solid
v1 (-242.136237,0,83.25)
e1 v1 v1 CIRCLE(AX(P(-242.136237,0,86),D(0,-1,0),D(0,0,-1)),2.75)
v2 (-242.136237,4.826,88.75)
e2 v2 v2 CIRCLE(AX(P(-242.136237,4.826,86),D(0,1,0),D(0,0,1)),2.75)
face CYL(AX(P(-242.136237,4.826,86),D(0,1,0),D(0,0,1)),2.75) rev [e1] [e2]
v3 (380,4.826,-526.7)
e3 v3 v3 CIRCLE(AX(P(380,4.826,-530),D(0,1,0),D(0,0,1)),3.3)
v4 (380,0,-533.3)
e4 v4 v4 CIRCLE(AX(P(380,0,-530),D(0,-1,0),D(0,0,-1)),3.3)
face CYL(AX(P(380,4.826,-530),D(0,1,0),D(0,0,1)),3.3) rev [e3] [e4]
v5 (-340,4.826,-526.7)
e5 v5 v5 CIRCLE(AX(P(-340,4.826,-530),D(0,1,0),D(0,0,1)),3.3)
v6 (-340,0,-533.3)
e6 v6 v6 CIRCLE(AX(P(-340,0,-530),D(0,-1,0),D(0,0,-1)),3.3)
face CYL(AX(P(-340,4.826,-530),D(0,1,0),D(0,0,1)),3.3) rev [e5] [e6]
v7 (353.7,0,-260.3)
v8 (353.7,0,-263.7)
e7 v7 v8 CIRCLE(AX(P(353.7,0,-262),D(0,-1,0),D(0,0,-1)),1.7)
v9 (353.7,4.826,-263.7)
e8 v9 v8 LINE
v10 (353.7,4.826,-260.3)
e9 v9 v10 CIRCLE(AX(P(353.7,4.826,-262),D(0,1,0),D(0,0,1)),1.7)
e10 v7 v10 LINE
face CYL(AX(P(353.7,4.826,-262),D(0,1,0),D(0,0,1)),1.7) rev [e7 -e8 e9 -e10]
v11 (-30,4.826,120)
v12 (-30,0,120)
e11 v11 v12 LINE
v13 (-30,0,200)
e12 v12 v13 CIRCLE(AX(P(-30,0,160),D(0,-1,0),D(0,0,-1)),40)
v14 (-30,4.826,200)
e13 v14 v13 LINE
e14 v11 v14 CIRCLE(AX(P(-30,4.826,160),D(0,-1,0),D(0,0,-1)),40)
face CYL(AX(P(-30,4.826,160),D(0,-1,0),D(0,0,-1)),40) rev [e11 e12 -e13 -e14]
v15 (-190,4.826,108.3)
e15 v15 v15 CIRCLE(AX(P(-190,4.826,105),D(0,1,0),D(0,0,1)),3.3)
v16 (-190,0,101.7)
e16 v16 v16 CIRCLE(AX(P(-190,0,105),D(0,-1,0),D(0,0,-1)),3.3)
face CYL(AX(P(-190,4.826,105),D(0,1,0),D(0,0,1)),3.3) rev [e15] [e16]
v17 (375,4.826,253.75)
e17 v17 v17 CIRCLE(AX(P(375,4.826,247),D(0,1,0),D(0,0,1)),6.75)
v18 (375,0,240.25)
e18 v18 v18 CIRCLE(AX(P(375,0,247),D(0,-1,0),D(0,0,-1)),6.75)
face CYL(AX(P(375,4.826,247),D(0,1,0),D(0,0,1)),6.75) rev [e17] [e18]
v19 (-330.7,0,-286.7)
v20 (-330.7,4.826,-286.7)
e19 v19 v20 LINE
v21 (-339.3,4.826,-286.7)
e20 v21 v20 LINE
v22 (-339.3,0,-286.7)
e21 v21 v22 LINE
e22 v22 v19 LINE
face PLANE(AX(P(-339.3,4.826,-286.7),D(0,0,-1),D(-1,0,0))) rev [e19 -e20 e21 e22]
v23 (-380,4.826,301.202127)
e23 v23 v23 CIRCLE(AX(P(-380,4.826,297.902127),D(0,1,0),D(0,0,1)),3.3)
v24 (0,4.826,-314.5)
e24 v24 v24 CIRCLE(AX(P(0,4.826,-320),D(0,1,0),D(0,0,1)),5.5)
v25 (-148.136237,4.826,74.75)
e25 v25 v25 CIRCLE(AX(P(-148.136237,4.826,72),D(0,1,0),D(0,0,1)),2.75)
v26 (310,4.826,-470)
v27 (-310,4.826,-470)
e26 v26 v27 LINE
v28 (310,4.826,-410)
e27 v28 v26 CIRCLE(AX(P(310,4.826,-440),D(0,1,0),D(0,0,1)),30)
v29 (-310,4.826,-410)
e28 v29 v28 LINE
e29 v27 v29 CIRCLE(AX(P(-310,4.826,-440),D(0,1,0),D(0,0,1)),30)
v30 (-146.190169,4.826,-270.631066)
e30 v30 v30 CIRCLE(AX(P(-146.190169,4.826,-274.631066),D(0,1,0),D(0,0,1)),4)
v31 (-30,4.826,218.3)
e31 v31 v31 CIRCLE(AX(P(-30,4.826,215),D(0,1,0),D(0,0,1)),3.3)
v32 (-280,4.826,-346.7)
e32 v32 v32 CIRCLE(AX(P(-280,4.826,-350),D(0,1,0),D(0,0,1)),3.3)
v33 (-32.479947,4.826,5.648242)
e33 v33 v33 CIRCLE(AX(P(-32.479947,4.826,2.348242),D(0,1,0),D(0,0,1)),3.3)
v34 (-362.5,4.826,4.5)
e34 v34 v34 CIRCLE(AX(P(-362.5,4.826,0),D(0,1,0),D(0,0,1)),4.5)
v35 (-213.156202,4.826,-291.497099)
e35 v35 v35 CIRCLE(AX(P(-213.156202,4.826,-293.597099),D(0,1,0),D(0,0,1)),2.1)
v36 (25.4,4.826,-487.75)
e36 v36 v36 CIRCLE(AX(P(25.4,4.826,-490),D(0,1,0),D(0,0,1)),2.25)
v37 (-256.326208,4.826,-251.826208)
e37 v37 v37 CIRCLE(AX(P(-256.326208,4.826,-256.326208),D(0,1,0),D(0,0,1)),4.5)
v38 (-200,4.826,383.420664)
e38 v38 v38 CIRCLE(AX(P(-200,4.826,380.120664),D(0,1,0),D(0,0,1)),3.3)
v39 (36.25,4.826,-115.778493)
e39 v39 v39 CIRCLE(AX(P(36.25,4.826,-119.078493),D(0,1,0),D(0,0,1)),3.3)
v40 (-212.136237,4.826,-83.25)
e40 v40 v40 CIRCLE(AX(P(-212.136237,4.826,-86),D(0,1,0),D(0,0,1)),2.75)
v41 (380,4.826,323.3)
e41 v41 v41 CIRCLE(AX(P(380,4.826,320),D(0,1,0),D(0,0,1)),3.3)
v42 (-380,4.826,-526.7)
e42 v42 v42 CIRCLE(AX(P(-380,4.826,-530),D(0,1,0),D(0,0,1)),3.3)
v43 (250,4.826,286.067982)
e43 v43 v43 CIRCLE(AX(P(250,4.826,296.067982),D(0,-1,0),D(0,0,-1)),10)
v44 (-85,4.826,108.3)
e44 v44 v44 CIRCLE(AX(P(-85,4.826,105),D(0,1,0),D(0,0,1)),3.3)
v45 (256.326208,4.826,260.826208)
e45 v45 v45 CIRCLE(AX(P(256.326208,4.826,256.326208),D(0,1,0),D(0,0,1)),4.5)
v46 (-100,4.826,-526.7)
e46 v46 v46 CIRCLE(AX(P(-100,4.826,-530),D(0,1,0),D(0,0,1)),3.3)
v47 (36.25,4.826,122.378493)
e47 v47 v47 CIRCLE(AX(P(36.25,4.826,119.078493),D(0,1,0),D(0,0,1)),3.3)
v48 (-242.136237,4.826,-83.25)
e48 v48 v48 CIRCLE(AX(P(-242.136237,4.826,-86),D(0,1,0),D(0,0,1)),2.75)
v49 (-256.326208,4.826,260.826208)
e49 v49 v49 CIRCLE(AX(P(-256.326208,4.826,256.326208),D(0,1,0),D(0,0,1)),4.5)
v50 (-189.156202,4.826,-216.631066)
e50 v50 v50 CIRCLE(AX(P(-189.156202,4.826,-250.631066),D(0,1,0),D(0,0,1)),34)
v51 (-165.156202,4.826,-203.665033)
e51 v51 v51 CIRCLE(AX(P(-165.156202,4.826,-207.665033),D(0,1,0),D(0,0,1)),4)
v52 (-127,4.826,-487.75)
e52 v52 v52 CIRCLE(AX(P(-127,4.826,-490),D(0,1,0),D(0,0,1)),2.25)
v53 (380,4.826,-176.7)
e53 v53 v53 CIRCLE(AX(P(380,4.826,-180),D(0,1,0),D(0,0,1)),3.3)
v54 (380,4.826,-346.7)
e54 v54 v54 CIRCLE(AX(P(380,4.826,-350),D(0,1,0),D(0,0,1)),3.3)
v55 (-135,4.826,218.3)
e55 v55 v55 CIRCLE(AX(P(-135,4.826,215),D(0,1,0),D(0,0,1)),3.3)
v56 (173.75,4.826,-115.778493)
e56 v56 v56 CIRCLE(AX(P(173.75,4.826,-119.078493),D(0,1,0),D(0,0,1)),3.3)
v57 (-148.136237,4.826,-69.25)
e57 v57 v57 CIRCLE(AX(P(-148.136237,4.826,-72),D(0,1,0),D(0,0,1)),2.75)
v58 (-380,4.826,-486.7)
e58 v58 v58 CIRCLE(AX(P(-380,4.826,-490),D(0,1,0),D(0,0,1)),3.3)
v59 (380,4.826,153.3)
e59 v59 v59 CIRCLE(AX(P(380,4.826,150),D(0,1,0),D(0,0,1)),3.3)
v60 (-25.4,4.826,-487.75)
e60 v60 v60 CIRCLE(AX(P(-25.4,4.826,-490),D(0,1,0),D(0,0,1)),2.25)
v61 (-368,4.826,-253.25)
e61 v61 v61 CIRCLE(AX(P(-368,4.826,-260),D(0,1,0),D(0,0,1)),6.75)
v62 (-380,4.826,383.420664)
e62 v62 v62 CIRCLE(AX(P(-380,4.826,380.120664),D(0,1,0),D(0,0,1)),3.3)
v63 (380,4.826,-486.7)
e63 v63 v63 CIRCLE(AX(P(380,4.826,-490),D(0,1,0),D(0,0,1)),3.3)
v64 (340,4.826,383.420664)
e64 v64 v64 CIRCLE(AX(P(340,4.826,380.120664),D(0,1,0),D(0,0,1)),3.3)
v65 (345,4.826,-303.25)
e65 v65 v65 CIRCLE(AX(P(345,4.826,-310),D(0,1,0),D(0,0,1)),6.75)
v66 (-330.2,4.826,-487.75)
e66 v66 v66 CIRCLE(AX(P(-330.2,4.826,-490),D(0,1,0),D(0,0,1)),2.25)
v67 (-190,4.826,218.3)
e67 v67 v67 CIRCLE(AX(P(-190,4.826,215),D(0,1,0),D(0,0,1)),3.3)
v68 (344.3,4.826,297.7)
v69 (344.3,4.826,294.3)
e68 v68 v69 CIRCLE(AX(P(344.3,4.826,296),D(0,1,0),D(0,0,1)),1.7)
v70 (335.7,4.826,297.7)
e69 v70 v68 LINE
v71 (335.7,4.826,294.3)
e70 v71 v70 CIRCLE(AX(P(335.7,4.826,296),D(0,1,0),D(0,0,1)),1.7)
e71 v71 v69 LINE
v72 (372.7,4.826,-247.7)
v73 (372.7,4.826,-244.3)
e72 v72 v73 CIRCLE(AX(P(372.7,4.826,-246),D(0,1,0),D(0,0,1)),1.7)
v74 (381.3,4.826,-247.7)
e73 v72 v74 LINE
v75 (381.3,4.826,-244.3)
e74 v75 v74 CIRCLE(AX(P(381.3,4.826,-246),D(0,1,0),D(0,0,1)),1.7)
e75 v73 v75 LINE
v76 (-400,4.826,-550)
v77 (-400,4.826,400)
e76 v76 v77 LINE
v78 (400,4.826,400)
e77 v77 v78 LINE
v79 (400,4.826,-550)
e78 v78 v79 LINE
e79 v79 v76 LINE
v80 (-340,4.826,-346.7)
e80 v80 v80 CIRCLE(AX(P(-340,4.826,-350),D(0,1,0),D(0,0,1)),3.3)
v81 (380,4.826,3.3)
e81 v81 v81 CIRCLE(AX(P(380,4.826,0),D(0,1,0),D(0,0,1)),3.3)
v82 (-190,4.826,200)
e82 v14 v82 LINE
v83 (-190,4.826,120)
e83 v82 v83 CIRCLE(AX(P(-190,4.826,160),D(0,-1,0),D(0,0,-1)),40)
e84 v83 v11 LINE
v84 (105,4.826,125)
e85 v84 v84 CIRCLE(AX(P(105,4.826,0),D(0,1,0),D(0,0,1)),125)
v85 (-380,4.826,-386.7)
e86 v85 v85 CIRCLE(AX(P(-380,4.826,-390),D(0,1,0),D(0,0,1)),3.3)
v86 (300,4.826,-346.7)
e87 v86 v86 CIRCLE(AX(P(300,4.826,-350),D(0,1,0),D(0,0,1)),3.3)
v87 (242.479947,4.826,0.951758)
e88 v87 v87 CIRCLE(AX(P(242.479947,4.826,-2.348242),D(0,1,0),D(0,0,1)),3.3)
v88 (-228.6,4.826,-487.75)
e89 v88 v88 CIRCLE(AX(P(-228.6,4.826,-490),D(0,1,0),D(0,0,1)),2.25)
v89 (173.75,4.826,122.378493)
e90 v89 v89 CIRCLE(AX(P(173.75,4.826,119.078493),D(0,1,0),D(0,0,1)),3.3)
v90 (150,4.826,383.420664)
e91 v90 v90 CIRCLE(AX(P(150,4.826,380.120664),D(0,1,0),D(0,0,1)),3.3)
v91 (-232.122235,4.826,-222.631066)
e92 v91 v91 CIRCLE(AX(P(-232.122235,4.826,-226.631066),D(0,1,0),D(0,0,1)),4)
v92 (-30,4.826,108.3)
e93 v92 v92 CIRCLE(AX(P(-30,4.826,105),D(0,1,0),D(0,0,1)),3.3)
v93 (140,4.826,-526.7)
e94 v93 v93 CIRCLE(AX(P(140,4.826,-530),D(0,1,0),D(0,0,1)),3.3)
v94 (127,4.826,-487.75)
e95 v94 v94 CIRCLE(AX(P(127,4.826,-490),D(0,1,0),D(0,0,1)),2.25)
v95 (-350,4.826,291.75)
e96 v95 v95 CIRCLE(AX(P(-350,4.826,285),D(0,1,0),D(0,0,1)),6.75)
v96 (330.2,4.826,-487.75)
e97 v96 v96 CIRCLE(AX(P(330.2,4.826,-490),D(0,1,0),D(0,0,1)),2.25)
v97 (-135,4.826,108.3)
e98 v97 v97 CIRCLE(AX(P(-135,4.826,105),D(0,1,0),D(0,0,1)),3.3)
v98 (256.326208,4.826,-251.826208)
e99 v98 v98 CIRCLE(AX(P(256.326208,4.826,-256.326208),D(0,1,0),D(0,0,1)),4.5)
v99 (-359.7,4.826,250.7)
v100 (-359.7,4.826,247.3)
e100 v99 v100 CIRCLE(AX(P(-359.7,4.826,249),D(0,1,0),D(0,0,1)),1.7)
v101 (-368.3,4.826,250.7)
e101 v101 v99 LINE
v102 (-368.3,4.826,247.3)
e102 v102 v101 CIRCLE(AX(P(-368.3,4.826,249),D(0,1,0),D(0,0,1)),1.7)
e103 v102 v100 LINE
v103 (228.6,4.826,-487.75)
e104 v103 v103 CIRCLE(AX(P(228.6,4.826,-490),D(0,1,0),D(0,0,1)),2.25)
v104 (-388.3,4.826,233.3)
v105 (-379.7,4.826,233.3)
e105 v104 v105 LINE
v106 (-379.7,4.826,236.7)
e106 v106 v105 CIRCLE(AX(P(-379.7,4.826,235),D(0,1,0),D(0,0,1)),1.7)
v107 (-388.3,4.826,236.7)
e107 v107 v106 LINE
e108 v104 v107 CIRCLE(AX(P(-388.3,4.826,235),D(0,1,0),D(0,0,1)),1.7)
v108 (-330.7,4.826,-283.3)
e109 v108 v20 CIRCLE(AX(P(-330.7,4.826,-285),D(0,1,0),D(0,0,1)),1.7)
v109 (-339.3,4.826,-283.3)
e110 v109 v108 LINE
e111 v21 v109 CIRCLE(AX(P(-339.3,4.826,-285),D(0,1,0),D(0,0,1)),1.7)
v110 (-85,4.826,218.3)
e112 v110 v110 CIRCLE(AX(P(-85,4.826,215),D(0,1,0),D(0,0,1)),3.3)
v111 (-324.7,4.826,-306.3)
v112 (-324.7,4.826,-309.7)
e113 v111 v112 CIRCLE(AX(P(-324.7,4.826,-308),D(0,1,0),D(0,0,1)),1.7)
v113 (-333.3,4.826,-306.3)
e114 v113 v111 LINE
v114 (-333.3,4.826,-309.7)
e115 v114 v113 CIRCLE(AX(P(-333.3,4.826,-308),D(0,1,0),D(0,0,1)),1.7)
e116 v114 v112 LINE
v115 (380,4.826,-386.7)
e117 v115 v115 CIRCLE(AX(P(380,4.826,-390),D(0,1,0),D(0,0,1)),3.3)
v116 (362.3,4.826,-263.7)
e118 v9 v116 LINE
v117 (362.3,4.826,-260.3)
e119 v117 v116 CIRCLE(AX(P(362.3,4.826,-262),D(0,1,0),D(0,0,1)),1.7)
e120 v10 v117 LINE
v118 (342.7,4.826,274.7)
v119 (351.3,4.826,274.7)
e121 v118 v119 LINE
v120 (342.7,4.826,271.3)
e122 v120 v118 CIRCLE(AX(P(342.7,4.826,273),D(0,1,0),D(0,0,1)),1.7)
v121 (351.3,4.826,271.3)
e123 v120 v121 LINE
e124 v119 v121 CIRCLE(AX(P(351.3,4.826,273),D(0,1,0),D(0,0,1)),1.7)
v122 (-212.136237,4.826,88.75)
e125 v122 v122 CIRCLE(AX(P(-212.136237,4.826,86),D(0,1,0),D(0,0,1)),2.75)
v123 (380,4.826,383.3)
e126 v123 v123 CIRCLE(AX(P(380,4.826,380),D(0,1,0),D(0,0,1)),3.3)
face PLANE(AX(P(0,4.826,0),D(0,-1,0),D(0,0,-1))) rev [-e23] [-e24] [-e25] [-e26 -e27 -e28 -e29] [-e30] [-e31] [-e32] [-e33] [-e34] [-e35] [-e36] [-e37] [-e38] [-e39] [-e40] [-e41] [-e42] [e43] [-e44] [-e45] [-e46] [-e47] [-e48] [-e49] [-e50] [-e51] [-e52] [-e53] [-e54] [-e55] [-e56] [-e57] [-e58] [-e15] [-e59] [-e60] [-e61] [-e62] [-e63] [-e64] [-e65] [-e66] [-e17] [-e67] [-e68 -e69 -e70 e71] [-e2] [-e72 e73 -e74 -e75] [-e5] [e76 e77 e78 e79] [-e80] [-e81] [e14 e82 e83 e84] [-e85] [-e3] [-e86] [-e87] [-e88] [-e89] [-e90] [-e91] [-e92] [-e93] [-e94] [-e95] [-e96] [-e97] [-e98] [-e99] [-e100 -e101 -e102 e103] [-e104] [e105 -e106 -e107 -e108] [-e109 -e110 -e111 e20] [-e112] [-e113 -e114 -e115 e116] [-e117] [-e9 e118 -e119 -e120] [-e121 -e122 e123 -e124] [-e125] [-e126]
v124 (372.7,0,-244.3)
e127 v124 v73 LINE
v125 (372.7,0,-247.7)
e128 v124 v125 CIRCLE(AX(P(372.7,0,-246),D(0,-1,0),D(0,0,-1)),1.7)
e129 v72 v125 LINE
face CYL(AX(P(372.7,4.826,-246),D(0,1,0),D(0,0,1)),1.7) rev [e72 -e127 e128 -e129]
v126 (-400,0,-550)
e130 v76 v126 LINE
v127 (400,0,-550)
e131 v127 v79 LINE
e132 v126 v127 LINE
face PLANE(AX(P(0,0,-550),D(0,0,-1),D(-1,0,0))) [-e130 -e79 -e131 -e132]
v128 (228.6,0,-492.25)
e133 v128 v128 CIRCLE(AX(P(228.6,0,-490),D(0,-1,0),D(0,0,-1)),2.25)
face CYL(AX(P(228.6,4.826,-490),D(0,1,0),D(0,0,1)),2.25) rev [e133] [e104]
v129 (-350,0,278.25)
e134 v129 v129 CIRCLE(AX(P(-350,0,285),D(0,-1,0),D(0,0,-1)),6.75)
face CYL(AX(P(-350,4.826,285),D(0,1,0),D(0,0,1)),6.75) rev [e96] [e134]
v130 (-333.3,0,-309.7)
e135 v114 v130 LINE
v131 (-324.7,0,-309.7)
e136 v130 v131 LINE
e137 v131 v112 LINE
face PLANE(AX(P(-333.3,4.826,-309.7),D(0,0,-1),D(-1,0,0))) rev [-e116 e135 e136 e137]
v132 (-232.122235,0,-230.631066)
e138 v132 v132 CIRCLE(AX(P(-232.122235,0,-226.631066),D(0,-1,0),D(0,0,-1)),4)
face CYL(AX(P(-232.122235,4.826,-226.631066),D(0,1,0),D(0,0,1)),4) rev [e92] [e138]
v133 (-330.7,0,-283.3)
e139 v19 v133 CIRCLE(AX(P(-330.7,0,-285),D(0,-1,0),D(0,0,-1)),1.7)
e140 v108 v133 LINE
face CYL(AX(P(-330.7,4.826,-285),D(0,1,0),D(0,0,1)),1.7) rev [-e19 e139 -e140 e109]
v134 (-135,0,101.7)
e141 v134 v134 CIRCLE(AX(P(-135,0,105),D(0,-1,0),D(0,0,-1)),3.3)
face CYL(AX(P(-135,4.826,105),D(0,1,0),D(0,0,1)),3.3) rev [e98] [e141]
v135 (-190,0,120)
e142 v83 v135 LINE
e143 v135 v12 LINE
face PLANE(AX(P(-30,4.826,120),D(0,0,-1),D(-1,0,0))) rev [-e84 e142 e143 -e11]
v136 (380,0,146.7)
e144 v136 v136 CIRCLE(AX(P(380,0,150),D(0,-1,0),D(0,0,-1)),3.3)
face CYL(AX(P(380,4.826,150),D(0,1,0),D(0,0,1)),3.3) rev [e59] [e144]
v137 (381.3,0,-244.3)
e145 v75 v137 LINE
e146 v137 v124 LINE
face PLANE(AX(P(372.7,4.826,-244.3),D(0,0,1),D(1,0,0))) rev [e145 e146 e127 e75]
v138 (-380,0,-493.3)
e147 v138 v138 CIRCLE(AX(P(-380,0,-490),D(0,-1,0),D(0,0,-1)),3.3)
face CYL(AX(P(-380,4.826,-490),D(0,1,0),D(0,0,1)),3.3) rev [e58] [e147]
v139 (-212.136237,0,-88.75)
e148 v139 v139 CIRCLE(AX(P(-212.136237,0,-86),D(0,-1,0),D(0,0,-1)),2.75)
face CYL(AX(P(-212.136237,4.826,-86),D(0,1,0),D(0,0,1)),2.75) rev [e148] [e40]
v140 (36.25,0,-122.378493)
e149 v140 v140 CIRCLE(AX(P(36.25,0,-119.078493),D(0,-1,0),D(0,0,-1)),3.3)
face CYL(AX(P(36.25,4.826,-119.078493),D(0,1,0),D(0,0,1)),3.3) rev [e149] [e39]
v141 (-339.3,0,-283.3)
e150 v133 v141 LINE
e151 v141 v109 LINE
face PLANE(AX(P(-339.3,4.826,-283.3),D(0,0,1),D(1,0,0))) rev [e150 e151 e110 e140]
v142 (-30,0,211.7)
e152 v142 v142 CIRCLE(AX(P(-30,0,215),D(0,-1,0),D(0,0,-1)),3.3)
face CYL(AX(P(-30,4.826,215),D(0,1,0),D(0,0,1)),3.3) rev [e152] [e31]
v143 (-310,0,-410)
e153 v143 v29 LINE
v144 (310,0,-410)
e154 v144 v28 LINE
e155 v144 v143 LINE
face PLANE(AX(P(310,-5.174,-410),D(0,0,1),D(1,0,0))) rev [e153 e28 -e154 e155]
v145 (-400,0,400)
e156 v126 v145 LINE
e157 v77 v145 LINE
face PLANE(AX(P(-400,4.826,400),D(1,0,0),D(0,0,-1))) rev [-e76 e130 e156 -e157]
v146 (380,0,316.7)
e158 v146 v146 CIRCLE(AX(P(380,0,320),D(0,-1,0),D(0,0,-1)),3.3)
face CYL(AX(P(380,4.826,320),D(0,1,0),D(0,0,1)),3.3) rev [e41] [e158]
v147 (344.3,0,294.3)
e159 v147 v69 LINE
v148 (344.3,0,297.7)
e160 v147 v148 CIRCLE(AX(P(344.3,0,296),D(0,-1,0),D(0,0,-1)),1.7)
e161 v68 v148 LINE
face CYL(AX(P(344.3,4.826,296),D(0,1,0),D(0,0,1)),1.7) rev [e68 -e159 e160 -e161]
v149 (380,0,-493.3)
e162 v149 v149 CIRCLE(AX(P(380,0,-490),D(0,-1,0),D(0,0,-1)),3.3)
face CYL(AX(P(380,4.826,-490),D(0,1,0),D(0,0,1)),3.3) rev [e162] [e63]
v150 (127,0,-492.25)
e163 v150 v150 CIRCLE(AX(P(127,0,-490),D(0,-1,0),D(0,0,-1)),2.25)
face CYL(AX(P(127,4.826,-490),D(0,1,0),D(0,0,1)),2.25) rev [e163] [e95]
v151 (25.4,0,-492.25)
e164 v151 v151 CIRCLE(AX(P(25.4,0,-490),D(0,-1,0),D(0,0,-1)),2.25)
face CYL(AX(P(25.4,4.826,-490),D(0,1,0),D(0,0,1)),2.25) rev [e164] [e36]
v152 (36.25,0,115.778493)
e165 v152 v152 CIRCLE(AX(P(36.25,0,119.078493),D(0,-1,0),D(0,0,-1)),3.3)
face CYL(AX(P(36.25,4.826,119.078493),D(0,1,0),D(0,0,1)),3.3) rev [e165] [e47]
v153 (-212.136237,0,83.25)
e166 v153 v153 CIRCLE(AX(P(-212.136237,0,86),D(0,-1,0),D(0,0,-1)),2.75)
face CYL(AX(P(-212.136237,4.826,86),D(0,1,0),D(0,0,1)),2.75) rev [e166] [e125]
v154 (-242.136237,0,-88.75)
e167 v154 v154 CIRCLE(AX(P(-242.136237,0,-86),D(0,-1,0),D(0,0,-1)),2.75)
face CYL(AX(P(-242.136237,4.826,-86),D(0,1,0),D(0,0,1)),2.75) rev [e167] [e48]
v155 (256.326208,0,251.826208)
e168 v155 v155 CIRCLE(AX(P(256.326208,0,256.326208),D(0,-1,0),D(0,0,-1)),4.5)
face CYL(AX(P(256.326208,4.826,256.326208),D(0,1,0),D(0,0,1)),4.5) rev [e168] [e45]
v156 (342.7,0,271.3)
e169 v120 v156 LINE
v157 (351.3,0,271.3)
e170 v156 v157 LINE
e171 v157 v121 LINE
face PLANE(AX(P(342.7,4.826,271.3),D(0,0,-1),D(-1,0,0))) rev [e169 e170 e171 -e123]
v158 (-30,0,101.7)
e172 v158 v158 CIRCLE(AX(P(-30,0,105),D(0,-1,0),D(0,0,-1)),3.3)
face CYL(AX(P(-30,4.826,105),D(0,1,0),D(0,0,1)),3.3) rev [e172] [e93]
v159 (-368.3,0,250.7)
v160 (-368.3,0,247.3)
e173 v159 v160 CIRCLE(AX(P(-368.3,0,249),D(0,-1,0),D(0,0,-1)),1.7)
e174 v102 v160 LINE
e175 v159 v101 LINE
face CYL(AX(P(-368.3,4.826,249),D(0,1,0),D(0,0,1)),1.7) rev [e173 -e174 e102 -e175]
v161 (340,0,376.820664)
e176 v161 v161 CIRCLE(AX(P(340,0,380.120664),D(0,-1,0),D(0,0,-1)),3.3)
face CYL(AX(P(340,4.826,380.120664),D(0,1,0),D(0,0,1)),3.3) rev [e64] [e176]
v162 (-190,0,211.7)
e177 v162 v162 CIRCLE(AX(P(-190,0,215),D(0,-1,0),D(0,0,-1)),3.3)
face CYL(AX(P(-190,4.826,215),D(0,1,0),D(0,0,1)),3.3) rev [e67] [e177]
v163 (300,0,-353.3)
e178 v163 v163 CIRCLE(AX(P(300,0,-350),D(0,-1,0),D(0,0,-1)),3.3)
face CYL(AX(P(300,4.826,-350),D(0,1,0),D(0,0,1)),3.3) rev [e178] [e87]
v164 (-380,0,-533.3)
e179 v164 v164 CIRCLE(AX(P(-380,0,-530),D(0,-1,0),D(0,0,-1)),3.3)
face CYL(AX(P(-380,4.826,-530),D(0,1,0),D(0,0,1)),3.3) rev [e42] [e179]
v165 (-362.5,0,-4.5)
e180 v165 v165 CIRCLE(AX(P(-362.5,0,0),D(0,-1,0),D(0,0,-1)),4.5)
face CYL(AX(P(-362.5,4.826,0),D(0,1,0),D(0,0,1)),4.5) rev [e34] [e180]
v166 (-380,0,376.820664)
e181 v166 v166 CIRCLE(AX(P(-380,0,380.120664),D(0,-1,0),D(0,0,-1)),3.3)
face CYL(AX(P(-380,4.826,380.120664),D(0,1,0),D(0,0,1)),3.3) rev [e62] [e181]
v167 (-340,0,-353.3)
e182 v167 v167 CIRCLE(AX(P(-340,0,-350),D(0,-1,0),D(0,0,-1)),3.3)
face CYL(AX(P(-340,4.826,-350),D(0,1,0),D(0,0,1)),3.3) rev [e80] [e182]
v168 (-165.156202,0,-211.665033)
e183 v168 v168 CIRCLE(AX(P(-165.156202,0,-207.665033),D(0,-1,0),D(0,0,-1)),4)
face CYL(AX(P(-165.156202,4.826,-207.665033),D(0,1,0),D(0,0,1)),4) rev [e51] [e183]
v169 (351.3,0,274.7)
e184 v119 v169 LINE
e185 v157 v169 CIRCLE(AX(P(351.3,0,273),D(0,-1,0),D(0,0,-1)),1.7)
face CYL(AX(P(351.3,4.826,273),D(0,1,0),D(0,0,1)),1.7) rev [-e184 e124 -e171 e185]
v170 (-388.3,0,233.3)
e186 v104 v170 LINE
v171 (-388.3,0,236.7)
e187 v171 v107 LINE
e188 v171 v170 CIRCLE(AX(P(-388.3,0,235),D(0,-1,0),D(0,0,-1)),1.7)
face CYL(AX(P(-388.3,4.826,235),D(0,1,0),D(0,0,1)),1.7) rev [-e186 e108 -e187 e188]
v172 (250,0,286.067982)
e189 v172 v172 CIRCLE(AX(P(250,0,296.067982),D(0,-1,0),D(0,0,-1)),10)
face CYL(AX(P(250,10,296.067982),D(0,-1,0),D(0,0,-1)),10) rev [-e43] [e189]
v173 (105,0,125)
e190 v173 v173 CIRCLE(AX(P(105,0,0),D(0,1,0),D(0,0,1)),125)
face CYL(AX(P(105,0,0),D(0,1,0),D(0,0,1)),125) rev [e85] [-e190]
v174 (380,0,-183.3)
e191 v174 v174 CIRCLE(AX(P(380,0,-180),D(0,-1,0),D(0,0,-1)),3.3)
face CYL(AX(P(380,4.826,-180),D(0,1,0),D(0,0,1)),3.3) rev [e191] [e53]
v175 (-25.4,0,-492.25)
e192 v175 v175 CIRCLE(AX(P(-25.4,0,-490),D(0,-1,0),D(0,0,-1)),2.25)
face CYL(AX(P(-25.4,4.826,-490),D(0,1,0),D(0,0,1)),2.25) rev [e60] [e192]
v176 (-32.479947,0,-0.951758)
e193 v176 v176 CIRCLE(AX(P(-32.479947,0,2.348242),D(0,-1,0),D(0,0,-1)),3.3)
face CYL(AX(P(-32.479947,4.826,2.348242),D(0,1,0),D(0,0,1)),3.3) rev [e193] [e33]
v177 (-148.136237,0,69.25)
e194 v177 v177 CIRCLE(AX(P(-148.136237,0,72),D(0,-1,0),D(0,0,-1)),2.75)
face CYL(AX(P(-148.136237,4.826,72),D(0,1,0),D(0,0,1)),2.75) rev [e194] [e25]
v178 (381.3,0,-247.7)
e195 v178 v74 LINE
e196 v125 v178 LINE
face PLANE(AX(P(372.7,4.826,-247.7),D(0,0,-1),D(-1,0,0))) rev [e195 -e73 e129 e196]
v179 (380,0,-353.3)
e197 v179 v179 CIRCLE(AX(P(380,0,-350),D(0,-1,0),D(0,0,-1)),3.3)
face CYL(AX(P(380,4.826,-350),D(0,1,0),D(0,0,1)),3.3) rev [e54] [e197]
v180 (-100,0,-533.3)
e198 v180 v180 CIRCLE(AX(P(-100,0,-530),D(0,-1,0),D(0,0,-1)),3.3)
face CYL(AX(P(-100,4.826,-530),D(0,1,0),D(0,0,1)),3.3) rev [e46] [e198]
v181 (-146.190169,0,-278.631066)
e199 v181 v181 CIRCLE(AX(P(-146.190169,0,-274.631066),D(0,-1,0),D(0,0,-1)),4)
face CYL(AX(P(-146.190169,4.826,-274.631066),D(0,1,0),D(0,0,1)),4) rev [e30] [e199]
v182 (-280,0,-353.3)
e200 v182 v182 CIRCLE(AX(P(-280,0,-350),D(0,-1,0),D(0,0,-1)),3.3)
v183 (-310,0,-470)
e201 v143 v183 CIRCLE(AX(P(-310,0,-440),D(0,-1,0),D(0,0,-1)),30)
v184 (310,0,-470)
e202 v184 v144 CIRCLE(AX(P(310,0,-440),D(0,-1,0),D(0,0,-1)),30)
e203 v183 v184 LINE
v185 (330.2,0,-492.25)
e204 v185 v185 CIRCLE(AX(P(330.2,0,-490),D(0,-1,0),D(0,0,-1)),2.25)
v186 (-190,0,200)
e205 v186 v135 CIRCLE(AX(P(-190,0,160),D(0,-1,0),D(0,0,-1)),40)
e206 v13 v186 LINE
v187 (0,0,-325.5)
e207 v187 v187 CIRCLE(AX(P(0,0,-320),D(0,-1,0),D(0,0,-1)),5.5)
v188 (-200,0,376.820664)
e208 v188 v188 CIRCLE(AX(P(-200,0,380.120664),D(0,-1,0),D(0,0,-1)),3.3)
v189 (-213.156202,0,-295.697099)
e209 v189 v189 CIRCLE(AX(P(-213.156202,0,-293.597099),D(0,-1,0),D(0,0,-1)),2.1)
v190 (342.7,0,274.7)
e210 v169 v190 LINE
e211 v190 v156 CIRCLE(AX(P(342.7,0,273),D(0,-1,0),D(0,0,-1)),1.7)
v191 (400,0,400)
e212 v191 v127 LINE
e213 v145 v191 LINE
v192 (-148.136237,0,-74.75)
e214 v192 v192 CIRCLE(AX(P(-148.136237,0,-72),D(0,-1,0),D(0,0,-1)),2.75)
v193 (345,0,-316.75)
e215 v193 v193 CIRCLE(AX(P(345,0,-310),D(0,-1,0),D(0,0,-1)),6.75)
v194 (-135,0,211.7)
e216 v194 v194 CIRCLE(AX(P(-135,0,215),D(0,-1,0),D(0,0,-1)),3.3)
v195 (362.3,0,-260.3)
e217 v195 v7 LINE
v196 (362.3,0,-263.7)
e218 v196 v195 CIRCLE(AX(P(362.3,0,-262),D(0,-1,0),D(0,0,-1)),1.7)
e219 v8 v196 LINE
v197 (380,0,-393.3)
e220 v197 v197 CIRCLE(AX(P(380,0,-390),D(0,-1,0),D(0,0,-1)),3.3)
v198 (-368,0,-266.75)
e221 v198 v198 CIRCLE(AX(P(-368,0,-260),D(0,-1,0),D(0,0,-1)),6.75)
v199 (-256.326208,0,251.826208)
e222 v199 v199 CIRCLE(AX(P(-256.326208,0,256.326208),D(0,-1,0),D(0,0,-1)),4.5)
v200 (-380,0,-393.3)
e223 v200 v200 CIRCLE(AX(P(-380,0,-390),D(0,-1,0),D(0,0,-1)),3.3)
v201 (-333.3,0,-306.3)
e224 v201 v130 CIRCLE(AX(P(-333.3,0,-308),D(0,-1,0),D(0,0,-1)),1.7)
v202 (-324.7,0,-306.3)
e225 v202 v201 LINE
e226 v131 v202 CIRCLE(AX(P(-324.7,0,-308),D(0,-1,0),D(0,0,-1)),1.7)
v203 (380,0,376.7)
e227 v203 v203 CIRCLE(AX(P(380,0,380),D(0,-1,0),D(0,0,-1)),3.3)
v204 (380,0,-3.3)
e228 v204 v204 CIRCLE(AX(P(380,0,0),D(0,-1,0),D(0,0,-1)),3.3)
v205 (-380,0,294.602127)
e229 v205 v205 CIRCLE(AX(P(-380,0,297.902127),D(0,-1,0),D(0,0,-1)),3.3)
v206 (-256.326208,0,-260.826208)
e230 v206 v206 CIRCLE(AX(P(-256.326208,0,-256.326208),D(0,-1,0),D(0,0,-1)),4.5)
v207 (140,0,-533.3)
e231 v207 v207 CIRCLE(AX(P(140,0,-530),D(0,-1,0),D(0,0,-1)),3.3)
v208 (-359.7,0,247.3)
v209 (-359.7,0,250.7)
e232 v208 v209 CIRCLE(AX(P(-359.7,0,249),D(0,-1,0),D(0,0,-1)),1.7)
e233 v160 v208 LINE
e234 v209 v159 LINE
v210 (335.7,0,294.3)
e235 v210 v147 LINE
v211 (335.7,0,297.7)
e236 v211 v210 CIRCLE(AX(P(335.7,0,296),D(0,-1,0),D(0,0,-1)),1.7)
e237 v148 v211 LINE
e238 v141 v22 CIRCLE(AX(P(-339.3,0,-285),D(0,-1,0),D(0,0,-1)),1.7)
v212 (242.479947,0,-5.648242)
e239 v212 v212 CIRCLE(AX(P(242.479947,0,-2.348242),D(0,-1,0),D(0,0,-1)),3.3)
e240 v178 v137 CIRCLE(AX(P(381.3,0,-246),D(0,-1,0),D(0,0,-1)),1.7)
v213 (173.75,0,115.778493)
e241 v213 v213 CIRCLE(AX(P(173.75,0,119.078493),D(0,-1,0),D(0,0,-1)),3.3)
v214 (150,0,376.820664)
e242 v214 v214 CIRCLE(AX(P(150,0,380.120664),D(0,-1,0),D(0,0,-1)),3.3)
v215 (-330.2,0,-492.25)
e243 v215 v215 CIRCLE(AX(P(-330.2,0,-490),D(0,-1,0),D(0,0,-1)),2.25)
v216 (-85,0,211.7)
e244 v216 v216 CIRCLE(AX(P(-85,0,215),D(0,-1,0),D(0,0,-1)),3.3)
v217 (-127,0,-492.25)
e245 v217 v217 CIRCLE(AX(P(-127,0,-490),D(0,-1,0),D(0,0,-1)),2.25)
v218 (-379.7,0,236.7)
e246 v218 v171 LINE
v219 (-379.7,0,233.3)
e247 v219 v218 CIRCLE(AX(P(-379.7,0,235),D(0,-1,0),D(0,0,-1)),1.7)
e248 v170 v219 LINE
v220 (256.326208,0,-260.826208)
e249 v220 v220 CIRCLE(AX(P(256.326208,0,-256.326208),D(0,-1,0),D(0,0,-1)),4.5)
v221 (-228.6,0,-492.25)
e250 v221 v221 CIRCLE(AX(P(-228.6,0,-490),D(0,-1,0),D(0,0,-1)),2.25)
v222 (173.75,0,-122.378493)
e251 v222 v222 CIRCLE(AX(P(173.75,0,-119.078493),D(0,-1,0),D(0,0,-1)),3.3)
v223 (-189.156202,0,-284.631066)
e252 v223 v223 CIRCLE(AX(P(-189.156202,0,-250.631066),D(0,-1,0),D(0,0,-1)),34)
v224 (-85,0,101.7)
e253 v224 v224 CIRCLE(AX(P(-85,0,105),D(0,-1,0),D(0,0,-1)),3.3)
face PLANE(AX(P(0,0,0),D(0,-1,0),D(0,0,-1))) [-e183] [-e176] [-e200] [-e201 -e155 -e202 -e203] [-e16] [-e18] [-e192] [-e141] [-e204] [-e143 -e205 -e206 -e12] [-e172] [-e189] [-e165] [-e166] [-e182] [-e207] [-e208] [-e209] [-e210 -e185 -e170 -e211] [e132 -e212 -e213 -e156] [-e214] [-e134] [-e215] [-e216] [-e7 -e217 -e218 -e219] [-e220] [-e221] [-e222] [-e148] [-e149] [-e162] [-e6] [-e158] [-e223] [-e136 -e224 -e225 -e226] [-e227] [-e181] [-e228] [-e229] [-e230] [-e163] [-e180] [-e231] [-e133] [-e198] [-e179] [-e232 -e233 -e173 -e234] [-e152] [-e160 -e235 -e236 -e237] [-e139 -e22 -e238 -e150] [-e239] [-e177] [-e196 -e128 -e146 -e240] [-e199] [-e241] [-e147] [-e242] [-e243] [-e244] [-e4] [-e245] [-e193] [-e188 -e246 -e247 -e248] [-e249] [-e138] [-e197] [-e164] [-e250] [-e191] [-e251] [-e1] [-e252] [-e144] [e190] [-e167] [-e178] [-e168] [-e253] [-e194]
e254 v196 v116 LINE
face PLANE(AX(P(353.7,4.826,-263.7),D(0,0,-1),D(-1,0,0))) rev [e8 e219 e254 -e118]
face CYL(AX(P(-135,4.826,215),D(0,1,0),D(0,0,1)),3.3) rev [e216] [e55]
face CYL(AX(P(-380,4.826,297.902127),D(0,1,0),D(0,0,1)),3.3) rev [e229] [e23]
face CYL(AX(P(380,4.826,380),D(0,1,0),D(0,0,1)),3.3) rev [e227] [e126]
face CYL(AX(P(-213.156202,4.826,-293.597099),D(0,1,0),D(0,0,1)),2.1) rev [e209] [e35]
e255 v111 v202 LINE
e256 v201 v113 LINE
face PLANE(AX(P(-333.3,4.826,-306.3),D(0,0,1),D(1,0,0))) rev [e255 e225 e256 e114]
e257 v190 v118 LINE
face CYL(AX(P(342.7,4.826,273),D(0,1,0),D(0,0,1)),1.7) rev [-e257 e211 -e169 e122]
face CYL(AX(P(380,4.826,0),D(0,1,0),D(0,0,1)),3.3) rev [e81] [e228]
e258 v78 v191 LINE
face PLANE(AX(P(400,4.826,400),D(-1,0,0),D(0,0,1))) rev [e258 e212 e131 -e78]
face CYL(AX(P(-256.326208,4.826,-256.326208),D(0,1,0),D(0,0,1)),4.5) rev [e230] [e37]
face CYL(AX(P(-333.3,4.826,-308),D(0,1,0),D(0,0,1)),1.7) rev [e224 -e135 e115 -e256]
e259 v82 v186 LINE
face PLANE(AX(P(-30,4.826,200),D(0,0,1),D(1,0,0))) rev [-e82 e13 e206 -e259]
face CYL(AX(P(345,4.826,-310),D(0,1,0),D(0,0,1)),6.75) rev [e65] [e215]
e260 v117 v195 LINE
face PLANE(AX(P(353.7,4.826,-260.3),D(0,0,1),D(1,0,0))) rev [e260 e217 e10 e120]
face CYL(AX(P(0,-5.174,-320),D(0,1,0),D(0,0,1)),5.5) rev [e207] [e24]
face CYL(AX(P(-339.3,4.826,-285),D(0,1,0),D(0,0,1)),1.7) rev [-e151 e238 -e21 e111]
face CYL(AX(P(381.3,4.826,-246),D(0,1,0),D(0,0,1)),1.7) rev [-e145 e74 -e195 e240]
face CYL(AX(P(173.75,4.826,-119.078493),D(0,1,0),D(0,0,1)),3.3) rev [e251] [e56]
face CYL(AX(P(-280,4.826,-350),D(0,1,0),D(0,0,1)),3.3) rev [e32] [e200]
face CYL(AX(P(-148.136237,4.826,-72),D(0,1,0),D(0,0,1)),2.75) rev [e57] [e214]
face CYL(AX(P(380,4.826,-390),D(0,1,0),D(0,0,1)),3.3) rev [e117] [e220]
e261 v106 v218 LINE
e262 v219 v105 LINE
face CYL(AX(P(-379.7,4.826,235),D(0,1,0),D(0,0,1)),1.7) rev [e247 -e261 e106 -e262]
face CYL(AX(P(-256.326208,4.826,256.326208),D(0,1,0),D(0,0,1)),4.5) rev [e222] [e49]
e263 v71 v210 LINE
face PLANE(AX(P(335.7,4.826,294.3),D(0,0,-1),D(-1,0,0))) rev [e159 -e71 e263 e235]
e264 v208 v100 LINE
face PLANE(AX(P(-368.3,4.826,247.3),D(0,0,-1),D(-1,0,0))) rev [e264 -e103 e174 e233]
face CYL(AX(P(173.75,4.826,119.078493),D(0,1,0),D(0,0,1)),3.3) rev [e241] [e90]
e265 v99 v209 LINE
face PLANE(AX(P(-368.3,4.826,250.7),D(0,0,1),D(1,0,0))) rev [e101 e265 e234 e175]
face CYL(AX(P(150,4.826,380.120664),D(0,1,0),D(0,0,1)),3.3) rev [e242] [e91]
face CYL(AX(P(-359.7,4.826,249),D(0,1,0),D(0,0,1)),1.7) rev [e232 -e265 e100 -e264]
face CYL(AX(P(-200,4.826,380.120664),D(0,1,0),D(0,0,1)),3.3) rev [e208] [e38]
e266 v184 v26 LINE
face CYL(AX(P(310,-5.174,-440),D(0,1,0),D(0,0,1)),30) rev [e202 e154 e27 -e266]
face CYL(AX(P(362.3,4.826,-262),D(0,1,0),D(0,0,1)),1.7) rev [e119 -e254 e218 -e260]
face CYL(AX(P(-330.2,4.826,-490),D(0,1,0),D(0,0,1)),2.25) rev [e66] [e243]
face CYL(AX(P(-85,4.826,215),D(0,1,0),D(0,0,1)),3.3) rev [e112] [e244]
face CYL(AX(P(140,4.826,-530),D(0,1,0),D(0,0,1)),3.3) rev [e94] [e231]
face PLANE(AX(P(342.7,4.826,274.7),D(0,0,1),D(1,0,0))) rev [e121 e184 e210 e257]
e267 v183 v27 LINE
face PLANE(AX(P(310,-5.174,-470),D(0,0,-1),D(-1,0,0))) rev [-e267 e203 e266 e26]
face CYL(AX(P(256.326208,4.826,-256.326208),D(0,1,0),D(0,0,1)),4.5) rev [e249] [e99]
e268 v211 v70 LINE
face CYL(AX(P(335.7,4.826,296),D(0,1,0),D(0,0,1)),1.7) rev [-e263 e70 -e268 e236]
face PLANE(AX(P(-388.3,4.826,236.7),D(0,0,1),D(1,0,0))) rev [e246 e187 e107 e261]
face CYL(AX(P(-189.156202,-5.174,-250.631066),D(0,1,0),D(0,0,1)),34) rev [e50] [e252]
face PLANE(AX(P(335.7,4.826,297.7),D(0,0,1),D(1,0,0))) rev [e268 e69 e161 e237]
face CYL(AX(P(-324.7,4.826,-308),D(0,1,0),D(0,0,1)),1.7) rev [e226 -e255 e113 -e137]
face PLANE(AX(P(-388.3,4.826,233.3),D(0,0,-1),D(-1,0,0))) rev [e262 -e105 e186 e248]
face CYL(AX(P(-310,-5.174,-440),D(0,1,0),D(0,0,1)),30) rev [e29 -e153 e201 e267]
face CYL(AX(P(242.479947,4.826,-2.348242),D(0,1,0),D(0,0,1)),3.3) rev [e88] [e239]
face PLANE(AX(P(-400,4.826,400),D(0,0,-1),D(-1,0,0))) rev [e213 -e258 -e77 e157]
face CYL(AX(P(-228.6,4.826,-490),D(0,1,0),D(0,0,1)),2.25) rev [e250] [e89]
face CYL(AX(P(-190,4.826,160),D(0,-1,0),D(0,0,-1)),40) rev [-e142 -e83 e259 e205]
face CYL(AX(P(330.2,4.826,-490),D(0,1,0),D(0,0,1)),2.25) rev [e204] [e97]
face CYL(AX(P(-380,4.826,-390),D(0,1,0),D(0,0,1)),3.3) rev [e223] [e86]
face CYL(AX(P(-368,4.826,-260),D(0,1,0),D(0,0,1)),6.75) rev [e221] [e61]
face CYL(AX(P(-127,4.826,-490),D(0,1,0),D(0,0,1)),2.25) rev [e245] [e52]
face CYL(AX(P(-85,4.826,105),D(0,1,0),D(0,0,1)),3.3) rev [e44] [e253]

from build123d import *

# Parameters (mm, degrees)
SKETCH1_W                 = 800
SKETCH1_H                 = 800
BOSS_EXTRUDE1_DEPTH       = 4.826
SKETCH2_R                 = 125
CUT_EXTRUDE1_DEPTH        = 566.706010465
CUT_EXTRUDE2_DEPTH        = 566.706010465
SKETCH5_R                 = 34
CUT_EXTRUDE3_DEPTH        = 10
SKETCH6_R                 = 10
CUT_EXTRUDE4_DEPTH        = 10
F_8_0MM_DOWEL_HOLE1_D     = 8
F_8_0MM_DOWEL_HOLE1_DEPTH = 10.71
F_8_0MM_DOWEL_HOLE1_TIP   = 2.403442476
M5X0_8_TAPPED_HOLE1_D     = 4.2
M5X0_8_TAPPED_HOLE1_DEPTH = 12.4
M5X0_8_TAPPED_HOLE1_TIP   = 1.2618073
SKETCH13_W                = 800
SKETCH13_H                = 4.826
BOSS_EXTRUDE4_DEPTH       = 150
SKETCH30_R                = 5.5
CUT_EXTRUDE8_DEPTH        = 10
M4_CLEARANCE_HOLE2_D      = 4.5
M4_CLEARANCE_HOLE2_DEPTH  = 19.75
M4_CLEARANCE_HOLE2_TIP    = 1.351936393
M6_CLEARANCE_HOLE5_D      = 6.6
M6_CLEARANCE_HOLE5_DEPTH  = 19.75
M6_CLEARANCE_HOLE5_TIP    = 1.982840043
M5_CLEARANCE_HOLE2_D      = 5.5
M5_CLEARANCE_HOLE2_DEPTH  = 19.75
M5_CLEARANCE_HOLE2_TIP    = 1.652366702
M8_CLEARANCE_HOLE1_D      = 9
M8_CLEARANCE_HOLE1_DEPTH  = 19.75
M8_CLEARANCE_HOLE1_TIP    = 2.703872786
M6_CLEARANCE_HOLE2_D      = 6.6
M6_CLEARANCE_HOLE2_DEPTH  = 19.75
M6_CLEARANCE_HOLE2_TIP    = 1.982840043
M3_CLEARANCE_SLOT1_DEPTH  = 4.826
M12_CLEARANCE_HOLE1_D     = 13.5
M12_CLEARANCE_HOLE1_DEPTH = 19.75
M12_CLEARANCE_HOLE1_TIP   = 4.055809178
M6_CLEARANCE_HOLE4_D      = 6.6
M6_CLEARANCE_HOLE4_DEPTH  = 19.75
M6_CLEARANCE_HOLE4_TIP    = 1.982840043


# Read off the part's stored shape, not the designer's step: M3 Clearance Slot1
with BuildPart() as part:
    # Sketch1 → Boss-Extrude1 (new body)
    with BuildSketch(Plane(origin=(0, 0, 0), x_dir=(1, 0, 0), z_dir=(0, 1, 0))):
        Rectangle(SKETCH1_W, SKETCH1_H)
    extrude(amount=BOSS_EXTRUDE1_DEPTH)

    # Sketch2 → Cut-Extrude1 (cut, through all)
    with BuildSketch(Plane(origin=(0, 4.826, 0), x_dir=(1, 0, 0), z_dir=(0, 1, 0))):
        with Locations(Location((105, 0, 0), (0, 0, 270))):
            Circle(SKETCH2_R)
    extrude(amount=-CUT_EXTRUDE1_DEPTH, mode=Mode.SUBTRACT)

    # Sketch4 → Cut-Extrude2 (cut, through all)
    with BuildSketch(Plane(origin=(0, 0, 0), x_dir=(-1, 0, 0), z_dir=(0, -1, 0))):
        with BuildLine():
            Line((30, -120), (190, -120))
            ThreePointArc((190, -120), (230, -160), (190, -200))
            Line((190, -200), (30, -200))
            ThreePointArc((30, -200), (-10, -160), (30, -120))
        make_face()
    extrude(amount=-CUT_EXTRUDE2_DEPTH, mode=Mode.SUBTRACT)

    # Sketch5 → Cut-Extrude3 (cut)
    with BuildSketch(Plane(origin=(0, 4.826, 0), x_dir=(1, 0, 0), z_dir=(0, 1, 0))):
        with Locations(Location((-189.15620239, 250.631065707, 0), (0, 0, 270))):
            Circle(SKETCH5_R)
    extrude(amount=-CUT_EXTRUDE3_DEPTH, mode=Mode.SUBTRACT)

    # Sketch6 → Cut-Extrude4 (cut)
    with BuildSketch(Plane.XZ):
        with Locations(Location((250, 296.067982058, 0), (0, 0, 270))):
            Circle(SKETCH6_R)
    extrude(amount=-CUT_EXTRUDE4_DEPTH, mode=Mode.SUBTRACT)

    # Ø8.0mm Dowel Hole1
    with Locations(Plane(origin=(0, 4.826, 0), x_dir=(1, 0, 0), z_dir=(0, 1, 0))):
        with Locations((-232.122235486, 226.631065707), (-146.190169294, 274.631065707), (-165.15620239, 207.665032611)):
            Hole(F_8_0MM_DOWEL_HOLE1_D / 2, depth=F_8_0MM_DOWEL_HOLE1_DEPTH)
            with Locations((0, 0, -(F_8_0MM_DOWEL_HOLE1_DEPTH + F_8_0MM_DOWEL_HOLE1_TIP / 2))):  # 118° drill point
                Cone(0, F_8_0MM_DOWEL_HOLE1_D / 2, F_8_0MM_DOWEL_HOLE1_TIP, mode=Mode.SUBTRACT)

    # M5x0.8 Tapped Hole1
    with Locations(Plane(origin=(0, 4.826, 0), x_dir=(1, 0, 0), z_dir=(0, 1, 0))):
        with Locations((-213.15620239, 293.597098803)):
            Hole(M5X0_8_TAPPED_HOLE1_D / 2, depth=M5X0_8_TAPPED_HOLE1_DEPTH)
            with Locations((0, 0, -(M5X0_8_TAPPED_HOLE1_DEPTH + M5X0_8_TAPPED_HOLE1_TIP / 2))):  # 118° drill point
                Cone(0, M5X0_8_TAPPED_HOLE1_D / 2, M5X0_8_TAPPED_HOLE1_TIP, mode=Mode.SUBTRACT)

    # Sketch13 → Boss-Extrude4 (add)
    with BuildSketch(Plane(origin=(1600, 0, -400), x_dir=(1, 0, 0), z_dir=(0, 0, 1))):
        with Locations((-1600, 2.413)):
            Rectangle(SKETCH13_W, SKETCH13_H)
    extrude(amount=-BOSS_EXTRUDE4_DEPTH)

    # Sketch30 → Cut-Extrude8 (cut)
    with BuildSketch(Plane(origin=(0, 4.826, 0), x_dir=(1, 0, 0), z_dir=(0, 1, 0))):
        with Locations(Location((0, 320, 0), (0, 0, 270))):
            Circle(SKETCH30_R)
        with BuildLine():
            Line((310, 410), (-310, 410))
            ThreePointArc((-310, 410), (-340, 440), (-310, 470))
            Line((-310, 470), (310, 470))
            ThreePointArc((310, 470), (340, 440), (310, 410))
        make_face()
    extrude(amount=-CUT_EXTRUDE8_DEPTH, mode=Mode.SUBTRACT)

    # M4 Clearance Hole2
    with Locations(Plane(origin=(0, 4.826, 0), x_dir=(1, 0, 0), z_dir=(0, 1, 0))):
        with Locations((-330.2, 490), (330.2, 490), (228.6, 490), (127, 490), (25.4, 490), (-25.4, 490), (-127, 490), (-228.6, 490)):
            Hole(M4_CLEARANCE_HOLE2_D / 2, depth=M4_CLEARANCE_HOLE2_DEPTH)
            with Locations((0, 0, -(M4_CLEARANCE_HOLE2_DEPTH + M4_CLEARANCE_HOLE2_TIP / 2))):  # 118° drill point
                Cone(0, M4_CLEARANCE_HOLE2_D / 2, M4_CLEARANCE_HOLE2_TIP, mode=Mode.SUBTRACT)

    # M6 Clearance Hole5
    with Locations(Plane(origin=(0, 4.826, 0), x_dir=(1, 0, 0), z_dir=(0, 1, 0))):
        with Locations((-190, -215), (-30, -215), (-190, -105), (-30, -105), (-135, -215), (-85, -215), (-85, -105), (-135, -105)):
            Hole(M6_CLEARANCE_HOLE5_D / 2, depth=M6_CLEARANCE_HOLE5_DEPTH)
            with Locations((0, 0, -(M6_CLEARANCE_HOLE5_DEPTH + M6_CLEARANCE_HOLE5_TIP / 2))):  # 118° drill point
                Cone(0, M6_CLEARANCE_HOLE5_D / 2, M6_CLEARANCE_HOLE5_TIP, mode=Mode.SUBTRACT)

    # M5 Clearance Hole2
    with Locations(Plane(origin=(0, 4.826, 0), x_dir=(1, 0, 0), z_dir=(0, 1, 0))):
        with Locations((-242.136236567, -86), (-212.136236567, -86), (-148.136236567, -72), (-148.136236567, 72), (-212.136236567, 86), (-242.136236567, 86)):
            Hole(M5_CLEARANCE_HOLE2_D / 2, depth=M5_CLEARANCE_HOLE2_DEPTH)
            with Locations((0, 0, -(M5_CLEARANCE_HOLE2_DEPTH + M5_CLEARANCE_HOLE2_TIP / 2))):  # 118° drill point
                Cone(0, M5_CLEARANCE_HOLE2_D / 2, M5_CLEARANCE_HOLE2_TIP, mode=Mode.SUBTRACT)

    # M8 Clearance Hole1
    with Locations(Plane(origin=(0, 4.826, 0), x_dir=(1, 0, 0), z_dir=(0, 1, 0))):
        with Locations((-256.32620818, 256.32620818), (-362.5, 0), (-256.32620818, -256.32620818), (256.32620818, -256.32620818), (256.32620818, 256.32620818)):
            Hole(M8_CLEARANCE_HOLE1_D / 2, depth=M8_CLEARANCE_HOLE1_DEPTH)
            with Locations((0, 0, -(M8_CLEARANCE_HOLE1_DEPTH + M8_CLEARANCE_HOLE1_TIP / 2))):  # 118° drill point
                Cone(0, M8_CLEARANCE_HOLE1_D / 2, M8_CLEARANCE_HOLE1_TIP, mode=Mode.SUBTRACT)

    # M6 Clearance Hole2
    with Locations(Plane(origin=(0, 4.826, 0), x_dir=(1, 0, 0), z_dir=(0, 1, 0))):
        with Locations((173.75, -119.07849302), (105, 0), (36.25, -119.07849302), (-32.479946748, -2.34824234), (36.25, 119.07849302), (173.75, 119.07849302), (242.479946748, 2.34824234)):
            Hole(M6_CLEARANCE_HOLE2_D / 2, depth=M6_CLEARANCE_HOLE2_DEPTH)
            with Locations((0, 0, -(M6_CLEARANCE_HOLE2_DEPTH + M6_CLEARANCE_HOLE2_TIP / 2))):  # 118° drill point
                Cone(0, M6_CLEARANCE_HOLE2_D / 2, M6_CLEARANCE_HOLE2_TIP, mode=Mode.SUBTRACT)

    # M3 Clearance Slot1 outline → M3 Clearance Slot1 (cut)
    with BuildSketch(Plane(origin=(0, 0, 0), x_dir=(1, 0, 0), z_dir=(0, 1, 0))):
        with BuildLine():
            Line((342.7, -274.7), (351.3, -274.7))
            ThreePointArc((351.3, -274.7), (353, -273), (351.3, -271.3))
            Line((351.3, -271.3), (342.7, -271.3))
            ThreePointArc((342.7, -271.3), (341, -273), (342.7, -274.7))
        make_face()
        with BuildLine():
            Line((335.7, -297.7), (344.3, -297.7))
            ThreePointArc((344.3, -297.7), (346, -296), (344.3, -294.3))
            Line((344.3, -294.3), (335.7, -294.3))
            ThreePointArc((335.7, -294.3), (334, -296), (335.7, -297.7))
        make_face()
        with BuildLine():
            Line((353.7, 260.3), (362.3, 260.3))
            ThreePointArc((362.3, 260.3), (364, 262), (362.3, 263.7))
            Line((362.3, 263.7), (353.7, 263.7))
            ThreePointArc((353.7, 263.7), (352, 262), (353.7, 260.3))
        make_face()
        with BuildLine():
            Line((372.7, 244.3), (381.3, 244.3))
            ThreePointArc((381.3, 244.3), (383, 246), (381.3, 247.7))
            Line((381.3, 247.7), (372.7, 247.7))
            ThreePointArc((372.7, 247.7), (371, 246), (372.7, 244.3))
        make_face()
        with BuildLine():
            Line((-339.3, 283.3), (-330.7, 283.3))
            ThreePointArc((-330.7, 283.3), (-329, 285), (-330.7, 286.7))
            Line((-330.7, 286.7), (-339.3, 286.7))
            ThreePointArc((-339.3, 286.7), (-341, 285), (-339.3, 283.3))
        make_face()
        with BuildLine():
            Line((-333.3, 306.3), (-324.7, 306.3))
            ThreePointArc((-324.7, 306.3), (-323, 308), (-324.7, 309.7))
            Line((-324.7, 309.7), (-333.3, 309.7))
            ThreePointArc((-333.3, 309.7), (-335, 308), (-333.3, 306.3))
        make_face()
        with BuildLine():
            Line((-388.3, -236.7), (-379.7, -236.7))
            ThreePointArc((-379.7, -236.7), (-378, -235), (-379.7, -233.3))
            Line((-379.7, -233.3), (-388.3, -233.3))
            ThreePointArc((-388.3, -233.3), (-390, -235), (-388.3, -236.7))
        make_face()
        with BuildLine():
            Line((-368.3, -250.7), (-359.7, -250.7))
            ThreePointArc((-359.7, -250.7), (-358, -249), (-359.7, -247.3))
            Line((-359.7, -247.3), (-368.3, -247.3))
            ThreePointArc((-368.3, -247.3), (-370, -249), (-368.3, -250.7))
        make_face()
    extrude(amount=M3_CLEARANCE_SLOT1_DEPTH, mode=Mode.SUBTRACT)

    # M12 Clearance Hole1
    with Locations(Plane(origin=(0, 4.826, 0), x_dir=(1, 0, 0), z_dir=(0, 1, 0))):
        with Locations((-368, 260), (345, 310), (375, -247), (-350, -285)):
            Hole(M12_CLEARANCE_HOLE1_D / 2, depth=M12_CLEARANCE_HOLE1_DEPTH)
            with Locations((0, 0, -(M12_CLEARANCE_HOLE1_DEPTH + M12_CLEARANCE_HOLE1_TIP / 2))):  # 118° drill point
                Cone(0, M12_CLEARANCE_HOLE1_D / 2, M12_CLEARANCE_HOLE1_TIP, mode=Mode.SUBTRACT)

    # M6 Clearance Hole4
    with Locations(Plane(origin=(0, 4.826, 0), x_dir=(1, 0, 0), z_dir=(0, 1, 0))):
        with Locations((-340, 350), (380, 530), (140, 530), (-100, 530), (-340, 530), (-380, 530), (-380, 490), (-380, 390), (-380, -297.902127426), (380, 490), (380, 390), (380, 180), (380, -150), (380, 0), (380, -320), (380, -380), (340, -380.12066422), (150, -380.12066422), (-200, -380.12066422), (-380, -380.12066422), (-280, 350), (380, 350), (300, 350)):
            Hole(M6_CLEARANCE_HOLE4_D / 2, depth=M6_CLEARANCE_HOLE4_DEPTH)
            with Locations((0, 0, -(M6_CLEARANCE_HOLE4_DEPTH + M6_CLEARANCE_HOLE4_TIP / 2))):  # 118° drill point
                Cone(0, M6_CLEARANCE_HOLE4_D / 2, M6_CLEARANCE_HOLE4_TIP, mode=Mode.SUBTRACT)


solid = part.part
